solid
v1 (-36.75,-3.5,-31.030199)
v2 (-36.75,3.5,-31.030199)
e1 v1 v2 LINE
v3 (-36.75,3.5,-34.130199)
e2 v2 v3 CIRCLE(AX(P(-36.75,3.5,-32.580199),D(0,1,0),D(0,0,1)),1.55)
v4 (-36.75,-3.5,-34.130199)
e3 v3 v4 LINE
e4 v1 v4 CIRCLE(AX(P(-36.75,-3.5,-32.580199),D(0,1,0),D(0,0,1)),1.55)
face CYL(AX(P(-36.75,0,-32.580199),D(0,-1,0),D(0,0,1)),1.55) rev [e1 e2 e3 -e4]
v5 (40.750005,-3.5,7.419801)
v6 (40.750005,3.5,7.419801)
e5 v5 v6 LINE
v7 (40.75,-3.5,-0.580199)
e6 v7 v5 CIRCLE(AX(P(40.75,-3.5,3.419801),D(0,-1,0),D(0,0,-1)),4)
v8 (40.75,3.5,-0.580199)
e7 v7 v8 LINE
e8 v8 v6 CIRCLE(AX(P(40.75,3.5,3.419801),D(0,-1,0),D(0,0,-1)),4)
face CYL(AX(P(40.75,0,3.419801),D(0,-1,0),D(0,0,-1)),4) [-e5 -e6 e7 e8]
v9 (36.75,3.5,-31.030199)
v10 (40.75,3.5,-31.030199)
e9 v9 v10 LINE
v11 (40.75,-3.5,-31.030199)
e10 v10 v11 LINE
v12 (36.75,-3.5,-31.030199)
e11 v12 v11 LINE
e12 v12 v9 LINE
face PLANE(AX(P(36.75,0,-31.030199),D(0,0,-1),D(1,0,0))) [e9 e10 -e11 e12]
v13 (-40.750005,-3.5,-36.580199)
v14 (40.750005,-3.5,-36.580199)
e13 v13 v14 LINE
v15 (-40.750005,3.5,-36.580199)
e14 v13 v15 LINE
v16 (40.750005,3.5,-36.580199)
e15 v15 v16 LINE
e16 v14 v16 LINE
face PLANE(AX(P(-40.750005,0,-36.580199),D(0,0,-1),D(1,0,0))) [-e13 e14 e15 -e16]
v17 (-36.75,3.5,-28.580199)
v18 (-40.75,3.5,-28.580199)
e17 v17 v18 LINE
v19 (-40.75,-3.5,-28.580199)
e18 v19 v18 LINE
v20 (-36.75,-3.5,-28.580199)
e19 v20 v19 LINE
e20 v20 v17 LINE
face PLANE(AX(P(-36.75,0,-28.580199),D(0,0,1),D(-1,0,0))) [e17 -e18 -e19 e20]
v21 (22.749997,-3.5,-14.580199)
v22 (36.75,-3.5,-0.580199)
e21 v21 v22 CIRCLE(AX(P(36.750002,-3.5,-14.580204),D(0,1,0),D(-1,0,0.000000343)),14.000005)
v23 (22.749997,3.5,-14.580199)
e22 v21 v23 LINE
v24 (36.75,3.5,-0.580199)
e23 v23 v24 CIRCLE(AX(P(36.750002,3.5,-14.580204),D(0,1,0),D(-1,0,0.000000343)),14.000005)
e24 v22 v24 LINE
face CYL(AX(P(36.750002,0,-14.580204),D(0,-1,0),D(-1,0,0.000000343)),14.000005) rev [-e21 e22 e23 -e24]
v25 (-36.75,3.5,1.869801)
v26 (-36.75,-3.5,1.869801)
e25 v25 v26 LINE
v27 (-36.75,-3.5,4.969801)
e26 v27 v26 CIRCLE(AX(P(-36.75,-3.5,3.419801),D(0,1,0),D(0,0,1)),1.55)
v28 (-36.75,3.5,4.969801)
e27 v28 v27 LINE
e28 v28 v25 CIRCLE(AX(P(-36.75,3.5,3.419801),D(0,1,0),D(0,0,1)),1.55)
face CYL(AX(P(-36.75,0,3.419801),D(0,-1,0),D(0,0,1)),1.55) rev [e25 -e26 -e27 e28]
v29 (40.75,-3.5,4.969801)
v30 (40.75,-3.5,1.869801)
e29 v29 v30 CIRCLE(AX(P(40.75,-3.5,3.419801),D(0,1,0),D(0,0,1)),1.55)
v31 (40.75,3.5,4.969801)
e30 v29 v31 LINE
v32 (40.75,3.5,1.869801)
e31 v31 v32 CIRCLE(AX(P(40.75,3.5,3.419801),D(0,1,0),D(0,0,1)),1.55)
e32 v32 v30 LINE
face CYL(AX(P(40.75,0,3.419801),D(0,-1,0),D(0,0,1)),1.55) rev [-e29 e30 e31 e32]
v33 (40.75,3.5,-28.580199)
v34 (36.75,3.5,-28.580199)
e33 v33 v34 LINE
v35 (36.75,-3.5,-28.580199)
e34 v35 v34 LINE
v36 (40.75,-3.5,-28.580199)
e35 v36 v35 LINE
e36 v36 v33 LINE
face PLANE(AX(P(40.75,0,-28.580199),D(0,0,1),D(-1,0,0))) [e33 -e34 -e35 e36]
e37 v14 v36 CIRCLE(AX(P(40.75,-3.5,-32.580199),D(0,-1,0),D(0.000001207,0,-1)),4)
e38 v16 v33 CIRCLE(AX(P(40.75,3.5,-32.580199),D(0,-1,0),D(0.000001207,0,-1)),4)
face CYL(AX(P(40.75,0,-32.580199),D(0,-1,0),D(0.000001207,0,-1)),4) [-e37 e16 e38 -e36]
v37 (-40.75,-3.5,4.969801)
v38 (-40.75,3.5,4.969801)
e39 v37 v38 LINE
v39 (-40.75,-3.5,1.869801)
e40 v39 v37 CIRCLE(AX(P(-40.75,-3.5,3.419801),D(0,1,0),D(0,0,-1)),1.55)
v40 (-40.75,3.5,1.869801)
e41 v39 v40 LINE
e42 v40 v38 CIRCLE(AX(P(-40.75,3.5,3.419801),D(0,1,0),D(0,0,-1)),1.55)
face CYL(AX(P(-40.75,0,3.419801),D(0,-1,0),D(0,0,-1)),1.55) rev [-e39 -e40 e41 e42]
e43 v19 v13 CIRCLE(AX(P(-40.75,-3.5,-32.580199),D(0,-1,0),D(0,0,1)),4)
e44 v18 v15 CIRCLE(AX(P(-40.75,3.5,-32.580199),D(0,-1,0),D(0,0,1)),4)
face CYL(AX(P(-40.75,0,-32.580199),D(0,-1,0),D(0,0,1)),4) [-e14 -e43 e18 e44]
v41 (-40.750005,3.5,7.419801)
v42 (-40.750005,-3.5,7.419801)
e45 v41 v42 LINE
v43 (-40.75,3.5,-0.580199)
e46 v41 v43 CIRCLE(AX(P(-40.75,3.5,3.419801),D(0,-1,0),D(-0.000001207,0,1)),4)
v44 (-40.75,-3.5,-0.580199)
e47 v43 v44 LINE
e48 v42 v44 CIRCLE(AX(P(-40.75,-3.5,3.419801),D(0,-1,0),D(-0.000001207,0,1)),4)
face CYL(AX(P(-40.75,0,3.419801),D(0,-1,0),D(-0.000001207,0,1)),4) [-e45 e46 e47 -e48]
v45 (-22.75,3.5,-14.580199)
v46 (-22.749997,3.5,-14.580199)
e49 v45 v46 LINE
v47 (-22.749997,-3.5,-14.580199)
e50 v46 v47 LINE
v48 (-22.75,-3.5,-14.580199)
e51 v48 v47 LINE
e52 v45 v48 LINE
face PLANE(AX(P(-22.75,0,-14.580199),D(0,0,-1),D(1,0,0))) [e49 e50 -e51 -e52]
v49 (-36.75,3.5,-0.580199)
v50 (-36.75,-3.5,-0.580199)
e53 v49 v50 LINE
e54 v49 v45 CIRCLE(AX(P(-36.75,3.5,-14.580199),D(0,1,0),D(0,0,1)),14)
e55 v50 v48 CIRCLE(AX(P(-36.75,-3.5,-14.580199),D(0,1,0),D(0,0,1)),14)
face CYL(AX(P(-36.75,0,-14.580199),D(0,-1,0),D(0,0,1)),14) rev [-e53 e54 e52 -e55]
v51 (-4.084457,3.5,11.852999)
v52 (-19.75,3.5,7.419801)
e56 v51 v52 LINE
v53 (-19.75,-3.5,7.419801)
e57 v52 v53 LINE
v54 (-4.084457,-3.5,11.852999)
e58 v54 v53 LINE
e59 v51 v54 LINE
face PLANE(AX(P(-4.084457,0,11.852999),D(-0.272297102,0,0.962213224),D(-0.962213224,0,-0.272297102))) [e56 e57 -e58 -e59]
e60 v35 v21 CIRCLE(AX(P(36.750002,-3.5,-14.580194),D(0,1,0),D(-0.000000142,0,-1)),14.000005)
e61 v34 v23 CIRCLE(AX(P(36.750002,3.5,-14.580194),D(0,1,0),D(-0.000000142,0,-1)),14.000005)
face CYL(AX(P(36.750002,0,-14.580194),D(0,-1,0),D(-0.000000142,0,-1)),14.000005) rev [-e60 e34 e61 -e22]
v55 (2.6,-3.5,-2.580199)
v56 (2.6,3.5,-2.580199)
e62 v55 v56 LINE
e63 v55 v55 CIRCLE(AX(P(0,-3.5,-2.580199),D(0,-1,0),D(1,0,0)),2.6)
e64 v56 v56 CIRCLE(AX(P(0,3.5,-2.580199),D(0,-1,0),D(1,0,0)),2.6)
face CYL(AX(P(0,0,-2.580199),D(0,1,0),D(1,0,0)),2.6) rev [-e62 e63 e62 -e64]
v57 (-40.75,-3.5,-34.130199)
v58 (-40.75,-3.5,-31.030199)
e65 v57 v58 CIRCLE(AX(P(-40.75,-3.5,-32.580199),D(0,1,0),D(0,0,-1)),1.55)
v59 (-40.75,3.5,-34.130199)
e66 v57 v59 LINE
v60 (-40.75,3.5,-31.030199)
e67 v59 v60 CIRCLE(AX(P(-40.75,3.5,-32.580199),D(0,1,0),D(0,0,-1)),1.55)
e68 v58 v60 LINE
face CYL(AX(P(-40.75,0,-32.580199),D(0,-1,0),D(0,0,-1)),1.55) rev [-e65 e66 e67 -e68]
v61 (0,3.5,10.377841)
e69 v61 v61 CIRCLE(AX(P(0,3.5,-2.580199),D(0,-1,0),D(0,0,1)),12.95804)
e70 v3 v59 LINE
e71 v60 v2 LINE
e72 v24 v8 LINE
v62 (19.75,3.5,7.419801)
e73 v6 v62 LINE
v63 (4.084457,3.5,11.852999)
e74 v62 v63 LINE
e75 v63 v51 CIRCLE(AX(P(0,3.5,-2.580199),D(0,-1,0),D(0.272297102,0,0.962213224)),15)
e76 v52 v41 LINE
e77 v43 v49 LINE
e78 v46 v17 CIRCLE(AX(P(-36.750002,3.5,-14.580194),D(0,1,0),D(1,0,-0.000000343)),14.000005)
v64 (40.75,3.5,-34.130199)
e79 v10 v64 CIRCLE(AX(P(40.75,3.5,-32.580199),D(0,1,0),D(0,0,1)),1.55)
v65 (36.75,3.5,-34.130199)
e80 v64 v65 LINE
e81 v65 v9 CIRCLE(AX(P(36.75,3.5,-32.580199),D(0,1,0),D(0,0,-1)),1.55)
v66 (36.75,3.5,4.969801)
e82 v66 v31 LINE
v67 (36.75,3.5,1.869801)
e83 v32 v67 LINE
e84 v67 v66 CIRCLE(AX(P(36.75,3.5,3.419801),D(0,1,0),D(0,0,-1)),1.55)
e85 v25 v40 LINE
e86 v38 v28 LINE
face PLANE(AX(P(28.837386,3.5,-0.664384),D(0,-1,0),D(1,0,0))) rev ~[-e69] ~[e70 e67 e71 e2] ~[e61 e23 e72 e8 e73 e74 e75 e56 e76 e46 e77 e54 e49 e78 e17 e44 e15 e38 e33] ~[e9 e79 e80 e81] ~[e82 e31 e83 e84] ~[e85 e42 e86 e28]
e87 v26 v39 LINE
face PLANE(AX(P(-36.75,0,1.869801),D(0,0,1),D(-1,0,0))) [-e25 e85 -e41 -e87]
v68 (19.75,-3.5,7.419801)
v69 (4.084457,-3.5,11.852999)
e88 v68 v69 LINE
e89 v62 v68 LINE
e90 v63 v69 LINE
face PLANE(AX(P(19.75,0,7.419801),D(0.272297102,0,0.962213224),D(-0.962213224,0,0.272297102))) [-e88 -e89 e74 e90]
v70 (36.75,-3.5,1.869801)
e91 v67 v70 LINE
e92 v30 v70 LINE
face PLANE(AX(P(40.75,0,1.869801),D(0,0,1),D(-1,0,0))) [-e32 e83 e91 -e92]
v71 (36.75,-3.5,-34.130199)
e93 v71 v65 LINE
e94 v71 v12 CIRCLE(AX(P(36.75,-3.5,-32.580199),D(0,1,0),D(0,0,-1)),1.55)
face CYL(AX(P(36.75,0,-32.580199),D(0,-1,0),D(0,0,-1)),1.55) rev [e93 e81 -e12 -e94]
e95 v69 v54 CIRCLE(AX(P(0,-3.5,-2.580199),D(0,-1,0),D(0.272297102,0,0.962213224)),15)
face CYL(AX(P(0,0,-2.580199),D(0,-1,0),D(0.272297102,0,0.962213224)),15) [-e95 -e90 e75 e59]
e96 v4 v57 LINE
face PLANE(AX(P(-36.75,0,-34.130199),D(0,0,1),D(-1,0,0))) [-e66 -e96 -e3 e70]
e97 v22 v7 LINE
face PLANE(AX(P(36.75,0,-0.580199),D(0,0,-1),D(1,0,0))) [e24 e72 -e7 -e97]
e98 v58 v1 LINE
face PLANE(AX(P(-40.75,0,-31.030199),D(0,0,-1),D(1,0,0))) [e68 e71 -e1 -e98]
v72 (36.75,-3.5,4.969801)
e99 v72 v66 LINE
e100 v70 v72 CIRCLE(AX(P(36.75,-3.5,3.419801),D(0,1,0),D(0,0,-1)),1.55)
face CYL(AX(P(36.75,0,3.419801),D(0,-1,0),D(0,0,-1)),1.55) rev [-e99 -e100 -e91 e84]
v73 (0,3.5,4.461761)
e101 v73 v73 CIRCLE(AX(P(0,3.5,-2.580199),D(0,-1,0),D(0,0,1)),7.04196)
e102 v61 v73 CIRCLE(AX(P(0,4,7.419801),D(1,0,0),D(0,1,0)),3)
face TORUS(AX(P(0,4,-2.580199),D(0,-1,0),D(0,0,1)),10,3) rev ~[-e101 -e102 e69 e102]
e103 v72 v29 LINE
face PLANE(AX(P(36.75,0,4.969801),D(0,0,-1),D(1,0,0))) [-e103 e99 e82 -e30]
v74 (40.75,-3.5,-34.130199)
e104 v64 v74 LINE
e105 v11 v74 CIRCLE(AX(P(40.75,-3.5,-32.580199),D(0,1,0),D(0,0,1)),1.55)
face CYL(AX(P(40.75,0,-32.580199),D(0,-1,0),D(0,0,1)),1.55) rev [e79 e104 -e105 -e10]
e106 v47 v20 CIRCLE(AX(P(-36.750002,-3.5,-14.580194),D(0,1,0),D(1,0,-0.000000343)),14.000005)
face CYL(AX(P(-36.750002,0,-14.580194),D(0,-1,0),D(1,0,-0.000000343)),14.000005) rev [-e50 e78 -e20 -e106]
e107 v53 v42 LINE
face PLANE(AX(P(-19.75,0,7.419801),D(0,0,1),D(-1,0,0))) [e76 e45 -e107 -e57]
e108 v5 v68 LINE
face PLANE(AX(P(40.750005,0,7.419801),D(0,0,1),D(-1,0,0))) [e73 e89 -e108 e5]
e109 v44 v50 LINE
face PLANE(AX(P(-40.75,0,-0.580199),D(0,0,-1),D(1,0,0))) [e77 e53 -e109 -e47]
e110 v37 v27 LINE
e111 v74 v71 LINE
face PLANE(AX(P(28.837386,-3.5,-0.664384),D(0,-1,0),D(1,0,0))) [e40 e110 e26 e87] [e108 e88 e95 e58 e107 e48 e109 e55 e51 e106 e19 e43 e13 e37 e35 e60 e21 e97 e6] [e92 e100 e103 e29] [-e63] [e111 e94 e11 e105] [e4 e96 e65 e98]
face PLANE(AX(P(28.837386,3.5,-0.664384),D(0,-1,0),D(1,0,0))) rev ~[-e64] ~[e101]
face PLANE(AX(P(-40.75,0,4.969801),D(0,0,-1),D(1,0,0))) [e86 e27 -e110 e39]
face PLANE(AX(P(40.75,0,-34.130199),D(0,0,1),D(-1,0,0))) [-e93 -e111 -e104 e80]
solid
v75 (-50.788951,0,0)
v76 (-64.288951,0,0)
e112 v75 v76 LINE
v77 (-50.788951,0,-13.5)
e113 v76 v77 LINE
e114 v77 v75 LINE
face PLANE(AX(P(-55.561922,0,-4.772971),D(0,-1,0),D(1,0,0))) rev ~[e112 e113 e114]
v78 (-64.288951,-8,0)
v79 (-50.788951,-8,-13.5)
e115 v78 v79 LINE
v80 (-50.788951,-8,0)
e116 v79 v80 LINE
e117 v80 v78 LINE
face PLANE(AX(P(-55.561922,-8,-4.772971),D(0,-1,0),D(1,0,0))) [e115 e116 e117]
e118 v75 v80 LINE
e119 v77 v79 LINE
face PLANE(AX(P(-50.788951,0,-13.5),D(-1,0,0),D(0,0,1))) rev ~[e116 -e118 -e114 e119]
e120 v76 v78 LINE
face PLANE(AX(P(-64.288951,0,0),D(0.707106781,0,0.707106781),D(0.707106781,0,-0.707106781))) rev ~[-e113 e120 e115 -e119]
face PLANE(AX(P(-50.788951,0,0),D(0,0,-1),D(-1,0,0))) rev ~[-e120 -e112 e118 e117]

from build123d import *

# Parameters (mm, degrees)
F0_R          = 2.6
F1_DEPTH      = 3.5
F1_DEPTH_BACK = 3.5
F2_DEPTH      = 8
F3_R          = 3


# Not quite as in the source:
# - ends of sketch curves that miss each other by under 0.0002 mm in the source are joined


with BuildPart() as f1:
    # F0 (on Front) → F1 (new body, two sides)
    with BuildSketch(Plane.XZ) as f1_sk:
        with BuildLine():
            Line((40.7500048285, 7.4198008843), (19.75, 7.4198008843))
            Line((19.75, 7.4198008843), (19.75, -14.5801991157))
            Line((19.75, -14.5801991157), (22.7499971869, -14.5801991157))
            ThreePointArc((22.7499971869, -14.5801991157), (26.8505050634, -4.6807041791), (36.75, -0.5801991157))
            Line((36.75, -0.5801991157), (40.75, -0.5801991157))
            ThreePointArc((40.75, -0.5801991157), (44.75, 3.4197984701), (40.7500048285, 7.4198008843))
        make_face()
        with BuildLine():
            Line((40.75, 1.8698008843), (36.75, 1.8698008843))
            ThreePointArc((36.75, 1.8698008843), (35.2, 3.4198008843), (36.75, 4.9698008843))
            Line((36.75, 4.9698008843), (40.75, 4.9698008843))
            ThreePointArc((40.75, 4.9698008843), (42.3, 3.4198008843), (40.75, 1.8698008843))
        make_face(mode=Mode.SUBTRACT)
        with BuildLine():
            Line((22.7499971869, -14.5801991157), (19.75, -14.5801991157))
            Line((19.75, -14.5801991157), (19.75, -36.5801991157))
            Line((19.75, -36.5801991157), (40.7500048285, -36.5801991157))
            ThreePointArc((40.7500048285, -36.5801991157), (44.75, -32.5801967015), (40.75, -28.5801991157))
            Line((40.75, -28.5801991157), (36.75, -28.5801991157))
            ThreePointArc((36.75, -28.5801991157), (26.8505050634, -24.4796940523), (22.7499971869, -14.5801991157))
        make_face()
        with BuildLine():
            ThreePointArc((40.75, -31.0301991157), (42.3, -32.5801991157), (40.75, -34.1301991157))
            Line((40.75, -34.1301991157), (36.75, -34.1301991157))
            ThreePointArc((36.75, -34.1301991157), (35.2, -32.5801991157), (36.75, -31.0301991157))
            Line((36.75, -31.0301991157), (40.75, -31.0301991157))
        make_face(mode=Mode.SUBTRACT)
        with BuildLine():
            ThreePointArc((4.0844565269, 11.8529992436), (11.9638381781, 6.4678159179), (15, -2.5801991157))
            ThreePointArc((15, -2.5801991157), (-9.0480150336, -14.5440372938), (-4.0844565269, 11.8529992436))
            Line((-4.0844565269, 11.8529992436), (-19.75, 7.4198008843))
            Line((-19.75, 7.4198008843), (-19.75, -14.5801991157))
            Line((-19.75, -14.5801991157), (-19.75, -36.5801991157))
            Line((-19.75, -36.5801991157), (0, -36.5801991157))
            Line((0, -36.5801991157), (19.75, -36.5801991157))
            Line((19.75, -36.5801991157), (19.75, -14.5801991157))
            Line((19.75, -14.5801991157), (19.75, 7.4198008843))
            Line((19.75, 7.4198008843), (4.0844565269, 11.8529992436))
        make_face()
        with BuildLine():
            ThreePointArc((-4.0844565269, 11.8529992436), (-9.0480150336, -14.5440372938), (15, -2.5801991157))
            ThreePointArc((15, -2.5801991157), (11.9638381781, 6.4678159179), (4.0844565269, 11.8529992436))
            ThreePointArc((4.0844565269, 11.8529992436), (0, 12.4198008843), (-4.0844565269, 11.8529992436))
        make_face()
        with Locations((0, -2.5801991157)):
            Circle(F0_R, mode=Mode.SUBTRACT)
        with BuildLine():
            Line((-19.75, -14.5801991157), (-19.75, 7.4198008843))
            Line((-19.75, 7.4198008843), (-40.7500048285, 7.4198008843))
            ThreePointArc((-40.7500048285, 7.4198008843), (-44.75, 3.4197984701), (-40.75, -0.5801991157))
            Line((-40.75, -0.5801991157), (-36.75, -0.5801991157))
            ThreePointArc((-36.75, -0.5801991157), (-26.8505050634, -4.6807041791), (-22.75, -14.5801991157))
            Line((-22.75, -14.5801991157), (-19.75, -14.5801991157))
        make_face()
        with BuildLine():
            ThreePointArc((-36.75, 4.9698008843), (-35.2, 3.4198008843), (-36.75, 1.8698008843))
            Line((-36.75, 1.8698008843), (-40.75, 1.8698008843))
            ThreePointArc((-40.75, 1.8698008843), (-42.3, 3.4198008843), (-40.75, 4.9698008843))
            Line((-40.75, 4.9698008843), (-36.75, 4.9698008843))
        make_face(mode=Mode.SUBTRACT)
        with BuildLine():
            Line((-19.75, -36.5801991157), (-19.75, -14.5801991157))
            Line((-19.75, -14.5801991157), (-22.7499971869, -14.5801991157))
            ThreePointArc((-22.7499971869, -14.5801991157), (-26.8505050634, -24.4796940523), (-36.75, -28.5801991157))
            Line((-36.75, -28.5801991157), (-40.75, -28.5801991157))
            ThreePointArc((-40.75, -28.5801991157), (-44.75, -32.5801967015), (-40.7500048285, -36.5801991157))
            Line((-40.7500048285, -36.5801991157), (-19.75, -36.5801991157))
        make_face()
        with BuildLine():
            Line((-36.75, -34.1301991157), (-40.75, -34.1301991157))
            ThreePointArc((-40.75, -34.1301991157), (-42.3, -32.5801991157), (-40.75, -31.0301991157))
            Line((-40.75, -31.0301991157), (-36.75, -31.0301991157))
            ThreePointArc((-36.75, -31.0301991157), (-35.2, -32.5801991157), (-36.75, -34.1301991157))
        make_face(mode=Mode.SUBTRACT)
    extrude(amount=F1_DEPTH)
    extrude(f1_sk.sketch, amount=-F1_DEPTH_BACK)

    # F3 (on Right) → F4 (revolve, cut)
    with BuildSketch(Plane.YZ):
        with Locations((4, 7.4198008843)):
            Circle(F3_R)
    revolve(axis=Axis((0, 0, -2.5801991157), (0, -1, 0)), mode=Mode.SUBTRACT)


with BuildPart() as f2:
    # F0 (on Front) → F2 (new body)
    with BuildSketch(Plane.XZ):
        Polygon((-50.7889514565, -13.5), (-50.7889514565, 0), (-64.2889514565, 0), align=None)
    extrude(amount=F2_DEPTH)


solid = Compound([f1.part, f2.part])
